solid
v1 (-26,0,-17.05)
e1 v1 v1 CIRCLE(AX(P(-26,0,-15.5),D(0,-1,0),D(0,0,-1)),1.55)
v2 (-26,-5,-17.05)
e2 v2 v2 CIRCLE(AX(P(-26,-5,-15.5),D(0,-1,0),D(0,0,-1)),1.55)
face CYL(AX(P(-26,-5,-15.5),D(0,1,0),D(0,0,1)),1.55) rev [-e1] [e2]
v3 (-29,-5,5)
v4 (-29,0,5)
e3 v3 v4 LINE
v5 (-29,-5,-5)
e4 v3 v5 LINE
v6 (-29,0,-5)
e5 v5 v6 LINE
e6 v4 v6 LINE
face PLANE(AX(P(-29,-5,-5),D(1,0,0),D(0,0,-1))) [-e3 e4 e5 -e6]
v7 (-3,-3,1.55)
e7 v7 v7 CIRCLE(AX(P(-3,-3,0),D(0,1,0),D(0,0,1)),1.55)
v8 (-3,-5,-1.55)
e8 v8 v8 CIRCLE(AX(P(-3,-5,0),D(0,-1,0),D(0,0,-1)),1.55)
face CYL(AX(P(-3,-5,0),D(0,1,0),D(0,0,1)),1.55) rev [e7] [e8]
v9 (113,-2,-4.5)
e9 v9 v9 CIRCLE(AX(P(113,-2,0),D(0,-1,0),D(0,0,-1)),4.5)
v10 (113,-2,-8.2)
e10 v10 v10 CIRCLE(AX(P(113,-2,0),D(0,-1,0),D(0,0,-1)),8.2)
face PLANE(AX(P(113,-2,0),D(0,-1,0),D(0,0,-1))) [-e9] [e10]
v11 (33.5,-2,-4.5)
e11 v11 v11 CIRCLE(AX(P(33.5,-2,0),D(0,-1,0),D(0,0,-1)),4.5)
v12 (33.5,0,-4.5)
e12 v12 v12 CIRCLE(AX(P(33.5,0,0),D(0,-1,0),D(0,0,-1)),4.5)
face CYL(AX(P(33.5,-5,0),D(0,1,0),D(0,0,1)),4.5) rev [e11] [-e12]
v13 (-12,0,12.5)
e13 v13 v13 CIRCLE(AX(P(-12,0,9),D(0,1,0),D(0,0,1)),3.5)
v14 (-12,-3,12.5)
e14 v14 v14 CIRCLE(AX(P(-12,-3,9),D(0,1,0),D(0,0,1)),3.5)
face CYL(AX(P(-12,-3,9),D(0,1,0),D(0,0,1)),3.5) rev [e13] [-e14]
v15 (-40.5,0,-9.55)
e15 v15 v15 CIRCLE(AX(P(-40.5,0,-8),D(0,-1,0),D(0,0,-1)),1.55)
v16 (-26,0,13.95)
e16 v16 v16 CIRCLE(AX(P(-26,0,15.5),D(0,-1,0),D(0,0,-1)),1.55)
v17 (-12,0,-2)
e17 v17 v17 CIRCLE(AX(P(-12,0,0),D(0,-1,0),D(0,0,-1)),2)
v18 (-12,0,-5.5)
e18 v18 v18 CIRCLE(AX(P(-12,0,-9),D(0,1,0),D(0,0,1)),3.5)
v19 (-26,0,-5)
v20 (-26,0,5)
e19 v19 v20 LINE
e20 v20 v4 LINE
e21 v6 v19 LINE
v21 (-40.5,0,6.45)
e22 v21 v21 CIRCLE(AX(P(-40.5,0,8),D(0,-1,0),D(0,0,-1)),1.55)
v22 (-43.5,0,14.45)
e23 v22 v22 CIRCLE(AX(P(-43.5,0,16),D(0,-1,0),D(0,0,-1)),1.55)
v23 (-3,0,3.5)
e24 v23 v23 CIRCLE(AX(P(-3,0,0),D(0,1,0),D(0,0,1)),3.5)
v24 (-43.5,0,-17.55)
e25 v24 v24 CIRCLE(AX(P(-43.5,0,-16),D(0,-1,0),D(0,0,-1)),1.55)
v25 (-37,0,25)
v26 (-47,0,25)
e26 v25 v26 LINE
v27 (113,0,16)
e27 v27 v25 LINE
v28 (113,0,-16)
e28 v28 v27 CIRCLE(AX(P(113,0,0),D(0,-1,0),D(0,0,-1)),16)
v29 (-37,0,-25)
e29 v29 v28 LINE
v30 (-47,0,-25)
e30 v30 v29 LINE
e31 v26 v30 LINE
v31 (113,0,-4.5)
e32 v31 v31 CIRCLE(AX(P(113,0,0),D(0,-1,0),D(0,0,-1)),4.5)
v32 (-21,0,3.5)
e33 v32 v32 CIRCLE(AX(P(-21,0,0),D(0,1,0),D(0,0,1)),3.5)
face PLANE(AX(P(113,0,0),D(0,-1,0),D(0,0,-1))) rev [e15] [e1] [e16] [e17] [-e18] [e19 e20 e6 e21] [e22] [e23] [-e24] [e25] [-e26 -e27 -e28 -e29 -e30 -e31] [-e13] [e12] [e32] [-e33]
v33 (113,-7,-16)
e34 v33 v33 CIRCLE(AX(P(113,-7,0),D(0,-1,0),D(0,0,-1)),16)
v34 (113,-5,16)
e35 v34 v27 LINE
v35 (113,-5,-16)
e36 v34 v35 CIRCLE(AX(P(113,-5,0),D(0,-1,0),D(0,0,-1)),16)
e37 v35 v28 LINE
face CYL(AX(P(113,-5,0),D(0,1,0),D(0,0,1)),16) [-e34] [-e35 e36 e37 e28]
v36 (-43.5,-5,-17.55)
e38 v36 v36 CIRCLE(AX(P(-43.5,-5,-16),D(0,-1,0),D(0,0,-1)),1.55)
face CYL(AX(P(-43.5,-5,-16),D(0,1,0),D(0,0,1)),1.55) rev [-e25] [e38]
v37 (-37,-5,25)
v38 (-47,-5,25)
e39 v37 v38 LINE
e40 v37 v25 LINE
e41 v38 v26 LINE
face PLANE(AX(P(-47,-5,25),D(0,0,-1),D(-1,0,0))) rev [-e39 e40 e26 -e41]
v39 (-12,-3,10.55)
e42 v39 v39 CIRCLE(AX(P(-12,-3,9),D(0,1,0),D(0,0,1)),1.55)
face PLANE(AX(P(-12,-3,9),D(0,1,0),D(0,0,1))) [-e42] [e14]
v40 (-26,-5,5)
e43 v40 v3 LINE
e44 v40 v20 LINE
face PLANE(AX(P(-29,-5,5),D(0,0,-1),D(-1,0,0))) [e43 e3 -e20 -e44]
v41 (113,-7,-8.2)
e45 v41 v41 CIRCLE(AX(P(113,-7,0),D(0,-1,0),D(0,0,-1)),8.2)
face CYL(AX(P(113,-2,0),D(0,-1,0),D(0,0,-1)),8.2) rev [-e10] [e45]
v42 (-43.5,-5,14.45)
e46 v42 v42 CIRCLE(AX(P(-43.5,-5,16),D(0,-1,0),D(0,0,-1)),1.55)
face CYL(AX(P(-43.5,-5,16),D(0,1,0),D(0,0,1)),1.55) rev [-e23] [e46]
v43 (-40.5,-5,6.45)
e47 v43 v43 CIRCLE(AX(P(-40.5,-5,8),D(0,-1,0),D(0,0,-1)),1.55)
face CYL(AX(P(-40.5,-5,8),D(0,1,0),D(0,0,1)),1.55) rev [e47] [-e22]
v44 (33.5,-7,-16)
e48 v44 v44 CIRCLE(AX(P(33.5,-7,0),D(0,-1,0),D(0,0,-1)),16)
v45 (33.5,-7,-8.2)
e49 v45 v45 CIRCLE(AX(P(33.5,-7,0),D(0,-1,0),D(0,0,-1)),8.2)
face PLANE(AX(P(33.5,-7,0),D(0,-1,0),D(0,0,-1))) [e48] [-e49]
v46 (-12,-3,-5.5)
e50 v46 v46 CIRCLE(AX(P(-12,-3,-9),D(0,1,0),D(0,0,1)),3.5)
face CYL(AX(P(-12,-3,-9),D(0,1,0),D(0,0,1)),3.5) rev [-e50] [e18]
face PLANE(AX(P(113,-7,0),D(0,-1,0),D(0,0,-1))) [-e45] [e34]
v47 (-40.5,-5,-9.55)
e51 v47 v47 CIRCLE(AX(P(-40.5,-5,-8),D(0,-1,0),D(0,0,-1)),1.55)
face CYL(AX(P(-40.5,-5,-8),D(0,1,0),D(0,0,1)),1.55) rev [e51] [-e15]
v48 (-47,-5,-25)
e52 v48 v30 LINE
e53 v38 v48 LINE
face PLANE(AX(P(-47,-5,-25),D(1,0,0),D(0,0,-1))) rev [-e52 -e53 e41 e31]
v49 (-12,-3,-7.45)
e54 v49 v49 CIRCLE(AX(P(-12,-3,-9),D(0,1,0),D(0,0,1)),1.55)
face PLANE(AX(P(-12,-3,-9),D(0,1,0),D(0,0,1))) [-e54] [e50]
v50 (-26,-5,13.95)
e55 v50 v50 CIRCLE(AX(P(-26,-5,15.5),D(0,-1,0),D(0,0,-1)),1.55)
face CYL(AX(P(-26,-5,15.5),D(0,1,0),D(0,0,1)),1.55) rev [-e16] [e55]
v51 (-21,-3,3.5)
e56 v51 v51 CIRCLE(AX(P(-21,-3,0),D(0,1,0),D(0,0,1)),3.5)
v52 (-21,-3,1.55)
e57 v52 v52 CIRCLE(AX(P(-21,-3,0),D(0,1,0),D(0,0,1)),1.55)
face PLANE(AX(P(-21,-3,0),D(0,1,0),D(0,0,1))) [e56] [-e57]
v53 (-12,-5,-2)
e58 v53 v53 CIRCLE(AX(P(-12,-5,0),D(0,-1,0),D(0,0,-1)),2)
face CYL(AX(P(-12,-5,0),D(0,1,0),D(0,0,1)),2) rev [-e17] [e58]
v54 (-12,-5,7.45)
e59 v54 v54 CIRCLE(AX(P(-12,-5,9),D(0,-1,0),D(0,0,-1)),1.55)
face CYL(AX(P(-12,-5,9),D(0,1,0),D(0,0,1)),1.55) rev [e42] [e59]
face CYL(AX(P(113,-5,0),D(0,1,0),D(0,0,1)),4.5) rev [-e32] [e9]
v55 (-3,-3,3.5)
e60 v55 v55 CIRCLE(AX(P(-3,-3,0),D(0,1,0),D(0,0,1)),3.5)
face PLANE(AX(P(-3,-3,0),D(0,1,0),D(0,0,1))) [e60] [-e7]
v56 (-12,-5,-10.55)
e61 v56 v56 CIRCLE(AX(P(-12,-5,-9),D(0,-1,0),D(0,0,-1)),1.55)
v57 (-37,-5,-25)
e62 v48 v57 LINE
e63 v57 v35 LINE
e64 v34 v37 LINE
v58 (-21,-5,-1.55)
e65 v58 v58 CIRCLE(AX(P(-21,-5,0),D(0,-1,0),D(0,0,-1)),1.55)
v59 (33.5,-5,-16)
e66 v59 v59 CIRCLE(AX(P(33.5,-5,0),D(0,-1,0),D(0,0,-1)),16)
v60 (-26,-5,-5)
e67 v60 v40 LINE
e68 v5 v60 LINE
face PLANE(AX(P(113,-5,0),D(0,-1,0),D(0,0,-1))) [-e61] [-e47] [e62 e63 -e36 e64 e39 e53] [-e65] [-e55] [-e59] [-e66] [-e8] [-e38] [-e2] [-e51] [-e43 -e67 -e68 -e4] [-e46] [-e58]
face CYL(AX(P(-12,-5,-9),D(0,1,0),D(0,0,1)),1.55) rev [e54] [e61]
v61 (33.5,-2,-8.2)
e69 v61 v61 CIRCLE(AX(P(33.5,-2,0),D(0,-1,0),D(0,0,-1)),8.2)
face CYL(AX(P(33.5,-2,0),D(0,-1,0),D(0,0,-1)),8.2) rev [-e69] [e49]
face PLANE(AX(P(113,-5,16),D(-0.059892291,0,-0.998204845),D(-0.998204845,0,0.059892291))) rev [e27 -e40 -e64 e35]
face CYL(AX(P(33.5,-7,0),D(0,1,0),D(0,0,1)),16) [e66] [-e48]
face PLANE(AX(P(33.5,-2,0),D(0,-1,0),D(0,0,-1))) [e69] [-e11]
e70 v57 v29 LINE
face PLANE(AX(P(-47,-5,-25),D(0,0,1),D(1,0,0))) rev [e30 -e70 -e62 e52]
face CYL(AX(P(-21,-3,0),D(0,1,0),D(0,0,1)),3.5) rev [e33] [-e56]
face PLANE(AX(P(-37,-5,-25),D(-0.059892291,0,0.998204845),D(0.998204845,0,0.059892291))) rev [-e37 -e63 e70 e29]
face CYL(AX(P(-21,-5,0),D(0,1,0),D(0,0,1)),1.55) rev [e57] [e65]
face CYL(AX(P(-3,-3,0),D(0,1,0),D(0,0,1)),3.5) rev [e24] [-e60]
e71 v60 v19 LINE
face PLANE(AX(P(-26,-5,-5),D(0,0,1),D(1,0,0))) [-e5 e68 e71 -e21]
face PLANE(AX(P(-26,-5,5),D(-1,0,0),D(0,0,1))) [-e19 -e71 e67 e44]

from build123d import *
from build123d.topology import SkipClean

# Parameters (mm, degrees)
SKETCH28_R           = 1.55
SKETCH28_R_2         = 4.5
SKETCH28_R_3         = 2
SKETCH28_W           = 10
SKETCH28_H           = 3
BOSS_EXTRUDE10_DEPTH = 5
SKETCH29_R           = 16
BOSS_EXTRUDE11_DEPTH = 2
SKETCH30_R           = 8.2
CUT_EXTRUDE1_DEPTH   = 5
SKETCH31_R           = 3.5
CUT_EXTRUDE2_DEPTH   = 3


with BuildPart() as part:
    # Sketch28 → Boss-Extrude10 (new body)
    with BuildSketch(Plane(origin=(-32, 0, 0), x_dir=(0, 0, 1), z_dir=(0, -1, 0))):
        with BuildLine():
            Line((-25, 15), (25, 15))
            Line((25, 15), (25, 5))
            Line((25, 5), (16, -145))
            ThreePointArc((16, -145), (0, -161), (-16, -145))
            Line((-16, -145), (-25, 5))
            Line((-25, 5), (-25, 15))
        make_face()
        with Locations((8, 8.5)):
            Circle(SKETCH28_R, mode=Mode.SUBTRACT)
        with Locations((-8, 8.5)):
            Circle(SKETCH28_R, mode=Mode.SUBTRACT)
        with Locations((16, 11.5)):
            Circle(SKETCH28_R, mode=Mode.SUBTRACT)
        with Locations((-16, 11.5)):
            Circle(SKETCH28_R, mode=Mode.SUBTRACT)
        with Locations((-15.5, -6)):
            Circle(SKETCH28_R, mode=Mode.SUBTRACT)
        with Locations((15.5, -6)):
            Circle(SKETCH28_R, mode=Mode.SUBTRACT)
        with Locations((0, -65.5)):
            Circle(SKETCH28_R_2, mode=Mode.SUBTRACT)
        with Locations((0, -20)):
            Circle(SKETCH28_R_3, mode=Mode.SUBTRACT)
        with Locations((0, -145)):
            Circle(SKETCH28_R_2, mode=Mode.SUBTRACT)
        with Locations((-9, -20)):
            Circle(SKETCH28_R, mode=Mode.SUBTRACT)
        with Locations((0, -11)):
            Circle(SKETCH28_R, mode=Mode.SUBTRACT)
        with Locations((9, -20)):
            Circle(SKETCH28_R, mode=Mode.SUBTRACT)
        with Locations((0, -29)):
            Circle(SKETCH28_R, mode=Mode.SUBTRACT)
        with Locations((0, -4.5)):
            Rectangle(SKETCH28_W, SKETCH28_H, mode=Mode.SUBTRACT)
    extrude(amount=BOSS_EXTRUDE10_DEPTH)

    # Sketch29 → Boss-Extrude11 (add)
    with SkipClean():  # the faces are left unmerged after this step: merging them gives an invalid solid
        with BuildSketch(Plane.XZ.offset(5)):
            with Locations((33.5, 0)):
                Circle(SKETCH29_R)
            with Locations((113, 0)):
                Circle(SKETCH29_R)
        extrude(amount=BOSS_EXTRUDE11_DEPTH)
    add(part.part.scale(1), mode=Mode.REPLACE)  # the faces are merged on a copy

    # Sketch30 → Cut-Extrude1 (cut)
    with BuildSketch(Plane.XZ.offset(7)):
        with Locations((33.5, 0)):
            Circle(SKETCH30_R)
        with Locations((113, 0)):
            Circle(SKETCH30_R)
    extrude(amount=-CUT_EXTRUDE1_DEPTH, mode=Mode.SUBTRACT)

    # Sketch31 → Cut-Extrude2 (cut)
    with BuildSketch(Plane(origin=(0, 0, 0), x_dir=(1, 0, 0), z_dir=(0, 1, 0))):
        with Locations((-12, 9)):
            Circle(SKETCH31_R)
        with Locations((-3, 0)):
            Circle(SKETCH31_R)
        with Locations((-12, -9)):
            Circle(SKETCH31_R)
        with Locations((-21, 0)):
            Circle(SKETCH31_R)
    extrude(amount=-CUT_EXTRUDE2_DEPTH, mode=Mode.SUBTRACT)


solid = part.part
